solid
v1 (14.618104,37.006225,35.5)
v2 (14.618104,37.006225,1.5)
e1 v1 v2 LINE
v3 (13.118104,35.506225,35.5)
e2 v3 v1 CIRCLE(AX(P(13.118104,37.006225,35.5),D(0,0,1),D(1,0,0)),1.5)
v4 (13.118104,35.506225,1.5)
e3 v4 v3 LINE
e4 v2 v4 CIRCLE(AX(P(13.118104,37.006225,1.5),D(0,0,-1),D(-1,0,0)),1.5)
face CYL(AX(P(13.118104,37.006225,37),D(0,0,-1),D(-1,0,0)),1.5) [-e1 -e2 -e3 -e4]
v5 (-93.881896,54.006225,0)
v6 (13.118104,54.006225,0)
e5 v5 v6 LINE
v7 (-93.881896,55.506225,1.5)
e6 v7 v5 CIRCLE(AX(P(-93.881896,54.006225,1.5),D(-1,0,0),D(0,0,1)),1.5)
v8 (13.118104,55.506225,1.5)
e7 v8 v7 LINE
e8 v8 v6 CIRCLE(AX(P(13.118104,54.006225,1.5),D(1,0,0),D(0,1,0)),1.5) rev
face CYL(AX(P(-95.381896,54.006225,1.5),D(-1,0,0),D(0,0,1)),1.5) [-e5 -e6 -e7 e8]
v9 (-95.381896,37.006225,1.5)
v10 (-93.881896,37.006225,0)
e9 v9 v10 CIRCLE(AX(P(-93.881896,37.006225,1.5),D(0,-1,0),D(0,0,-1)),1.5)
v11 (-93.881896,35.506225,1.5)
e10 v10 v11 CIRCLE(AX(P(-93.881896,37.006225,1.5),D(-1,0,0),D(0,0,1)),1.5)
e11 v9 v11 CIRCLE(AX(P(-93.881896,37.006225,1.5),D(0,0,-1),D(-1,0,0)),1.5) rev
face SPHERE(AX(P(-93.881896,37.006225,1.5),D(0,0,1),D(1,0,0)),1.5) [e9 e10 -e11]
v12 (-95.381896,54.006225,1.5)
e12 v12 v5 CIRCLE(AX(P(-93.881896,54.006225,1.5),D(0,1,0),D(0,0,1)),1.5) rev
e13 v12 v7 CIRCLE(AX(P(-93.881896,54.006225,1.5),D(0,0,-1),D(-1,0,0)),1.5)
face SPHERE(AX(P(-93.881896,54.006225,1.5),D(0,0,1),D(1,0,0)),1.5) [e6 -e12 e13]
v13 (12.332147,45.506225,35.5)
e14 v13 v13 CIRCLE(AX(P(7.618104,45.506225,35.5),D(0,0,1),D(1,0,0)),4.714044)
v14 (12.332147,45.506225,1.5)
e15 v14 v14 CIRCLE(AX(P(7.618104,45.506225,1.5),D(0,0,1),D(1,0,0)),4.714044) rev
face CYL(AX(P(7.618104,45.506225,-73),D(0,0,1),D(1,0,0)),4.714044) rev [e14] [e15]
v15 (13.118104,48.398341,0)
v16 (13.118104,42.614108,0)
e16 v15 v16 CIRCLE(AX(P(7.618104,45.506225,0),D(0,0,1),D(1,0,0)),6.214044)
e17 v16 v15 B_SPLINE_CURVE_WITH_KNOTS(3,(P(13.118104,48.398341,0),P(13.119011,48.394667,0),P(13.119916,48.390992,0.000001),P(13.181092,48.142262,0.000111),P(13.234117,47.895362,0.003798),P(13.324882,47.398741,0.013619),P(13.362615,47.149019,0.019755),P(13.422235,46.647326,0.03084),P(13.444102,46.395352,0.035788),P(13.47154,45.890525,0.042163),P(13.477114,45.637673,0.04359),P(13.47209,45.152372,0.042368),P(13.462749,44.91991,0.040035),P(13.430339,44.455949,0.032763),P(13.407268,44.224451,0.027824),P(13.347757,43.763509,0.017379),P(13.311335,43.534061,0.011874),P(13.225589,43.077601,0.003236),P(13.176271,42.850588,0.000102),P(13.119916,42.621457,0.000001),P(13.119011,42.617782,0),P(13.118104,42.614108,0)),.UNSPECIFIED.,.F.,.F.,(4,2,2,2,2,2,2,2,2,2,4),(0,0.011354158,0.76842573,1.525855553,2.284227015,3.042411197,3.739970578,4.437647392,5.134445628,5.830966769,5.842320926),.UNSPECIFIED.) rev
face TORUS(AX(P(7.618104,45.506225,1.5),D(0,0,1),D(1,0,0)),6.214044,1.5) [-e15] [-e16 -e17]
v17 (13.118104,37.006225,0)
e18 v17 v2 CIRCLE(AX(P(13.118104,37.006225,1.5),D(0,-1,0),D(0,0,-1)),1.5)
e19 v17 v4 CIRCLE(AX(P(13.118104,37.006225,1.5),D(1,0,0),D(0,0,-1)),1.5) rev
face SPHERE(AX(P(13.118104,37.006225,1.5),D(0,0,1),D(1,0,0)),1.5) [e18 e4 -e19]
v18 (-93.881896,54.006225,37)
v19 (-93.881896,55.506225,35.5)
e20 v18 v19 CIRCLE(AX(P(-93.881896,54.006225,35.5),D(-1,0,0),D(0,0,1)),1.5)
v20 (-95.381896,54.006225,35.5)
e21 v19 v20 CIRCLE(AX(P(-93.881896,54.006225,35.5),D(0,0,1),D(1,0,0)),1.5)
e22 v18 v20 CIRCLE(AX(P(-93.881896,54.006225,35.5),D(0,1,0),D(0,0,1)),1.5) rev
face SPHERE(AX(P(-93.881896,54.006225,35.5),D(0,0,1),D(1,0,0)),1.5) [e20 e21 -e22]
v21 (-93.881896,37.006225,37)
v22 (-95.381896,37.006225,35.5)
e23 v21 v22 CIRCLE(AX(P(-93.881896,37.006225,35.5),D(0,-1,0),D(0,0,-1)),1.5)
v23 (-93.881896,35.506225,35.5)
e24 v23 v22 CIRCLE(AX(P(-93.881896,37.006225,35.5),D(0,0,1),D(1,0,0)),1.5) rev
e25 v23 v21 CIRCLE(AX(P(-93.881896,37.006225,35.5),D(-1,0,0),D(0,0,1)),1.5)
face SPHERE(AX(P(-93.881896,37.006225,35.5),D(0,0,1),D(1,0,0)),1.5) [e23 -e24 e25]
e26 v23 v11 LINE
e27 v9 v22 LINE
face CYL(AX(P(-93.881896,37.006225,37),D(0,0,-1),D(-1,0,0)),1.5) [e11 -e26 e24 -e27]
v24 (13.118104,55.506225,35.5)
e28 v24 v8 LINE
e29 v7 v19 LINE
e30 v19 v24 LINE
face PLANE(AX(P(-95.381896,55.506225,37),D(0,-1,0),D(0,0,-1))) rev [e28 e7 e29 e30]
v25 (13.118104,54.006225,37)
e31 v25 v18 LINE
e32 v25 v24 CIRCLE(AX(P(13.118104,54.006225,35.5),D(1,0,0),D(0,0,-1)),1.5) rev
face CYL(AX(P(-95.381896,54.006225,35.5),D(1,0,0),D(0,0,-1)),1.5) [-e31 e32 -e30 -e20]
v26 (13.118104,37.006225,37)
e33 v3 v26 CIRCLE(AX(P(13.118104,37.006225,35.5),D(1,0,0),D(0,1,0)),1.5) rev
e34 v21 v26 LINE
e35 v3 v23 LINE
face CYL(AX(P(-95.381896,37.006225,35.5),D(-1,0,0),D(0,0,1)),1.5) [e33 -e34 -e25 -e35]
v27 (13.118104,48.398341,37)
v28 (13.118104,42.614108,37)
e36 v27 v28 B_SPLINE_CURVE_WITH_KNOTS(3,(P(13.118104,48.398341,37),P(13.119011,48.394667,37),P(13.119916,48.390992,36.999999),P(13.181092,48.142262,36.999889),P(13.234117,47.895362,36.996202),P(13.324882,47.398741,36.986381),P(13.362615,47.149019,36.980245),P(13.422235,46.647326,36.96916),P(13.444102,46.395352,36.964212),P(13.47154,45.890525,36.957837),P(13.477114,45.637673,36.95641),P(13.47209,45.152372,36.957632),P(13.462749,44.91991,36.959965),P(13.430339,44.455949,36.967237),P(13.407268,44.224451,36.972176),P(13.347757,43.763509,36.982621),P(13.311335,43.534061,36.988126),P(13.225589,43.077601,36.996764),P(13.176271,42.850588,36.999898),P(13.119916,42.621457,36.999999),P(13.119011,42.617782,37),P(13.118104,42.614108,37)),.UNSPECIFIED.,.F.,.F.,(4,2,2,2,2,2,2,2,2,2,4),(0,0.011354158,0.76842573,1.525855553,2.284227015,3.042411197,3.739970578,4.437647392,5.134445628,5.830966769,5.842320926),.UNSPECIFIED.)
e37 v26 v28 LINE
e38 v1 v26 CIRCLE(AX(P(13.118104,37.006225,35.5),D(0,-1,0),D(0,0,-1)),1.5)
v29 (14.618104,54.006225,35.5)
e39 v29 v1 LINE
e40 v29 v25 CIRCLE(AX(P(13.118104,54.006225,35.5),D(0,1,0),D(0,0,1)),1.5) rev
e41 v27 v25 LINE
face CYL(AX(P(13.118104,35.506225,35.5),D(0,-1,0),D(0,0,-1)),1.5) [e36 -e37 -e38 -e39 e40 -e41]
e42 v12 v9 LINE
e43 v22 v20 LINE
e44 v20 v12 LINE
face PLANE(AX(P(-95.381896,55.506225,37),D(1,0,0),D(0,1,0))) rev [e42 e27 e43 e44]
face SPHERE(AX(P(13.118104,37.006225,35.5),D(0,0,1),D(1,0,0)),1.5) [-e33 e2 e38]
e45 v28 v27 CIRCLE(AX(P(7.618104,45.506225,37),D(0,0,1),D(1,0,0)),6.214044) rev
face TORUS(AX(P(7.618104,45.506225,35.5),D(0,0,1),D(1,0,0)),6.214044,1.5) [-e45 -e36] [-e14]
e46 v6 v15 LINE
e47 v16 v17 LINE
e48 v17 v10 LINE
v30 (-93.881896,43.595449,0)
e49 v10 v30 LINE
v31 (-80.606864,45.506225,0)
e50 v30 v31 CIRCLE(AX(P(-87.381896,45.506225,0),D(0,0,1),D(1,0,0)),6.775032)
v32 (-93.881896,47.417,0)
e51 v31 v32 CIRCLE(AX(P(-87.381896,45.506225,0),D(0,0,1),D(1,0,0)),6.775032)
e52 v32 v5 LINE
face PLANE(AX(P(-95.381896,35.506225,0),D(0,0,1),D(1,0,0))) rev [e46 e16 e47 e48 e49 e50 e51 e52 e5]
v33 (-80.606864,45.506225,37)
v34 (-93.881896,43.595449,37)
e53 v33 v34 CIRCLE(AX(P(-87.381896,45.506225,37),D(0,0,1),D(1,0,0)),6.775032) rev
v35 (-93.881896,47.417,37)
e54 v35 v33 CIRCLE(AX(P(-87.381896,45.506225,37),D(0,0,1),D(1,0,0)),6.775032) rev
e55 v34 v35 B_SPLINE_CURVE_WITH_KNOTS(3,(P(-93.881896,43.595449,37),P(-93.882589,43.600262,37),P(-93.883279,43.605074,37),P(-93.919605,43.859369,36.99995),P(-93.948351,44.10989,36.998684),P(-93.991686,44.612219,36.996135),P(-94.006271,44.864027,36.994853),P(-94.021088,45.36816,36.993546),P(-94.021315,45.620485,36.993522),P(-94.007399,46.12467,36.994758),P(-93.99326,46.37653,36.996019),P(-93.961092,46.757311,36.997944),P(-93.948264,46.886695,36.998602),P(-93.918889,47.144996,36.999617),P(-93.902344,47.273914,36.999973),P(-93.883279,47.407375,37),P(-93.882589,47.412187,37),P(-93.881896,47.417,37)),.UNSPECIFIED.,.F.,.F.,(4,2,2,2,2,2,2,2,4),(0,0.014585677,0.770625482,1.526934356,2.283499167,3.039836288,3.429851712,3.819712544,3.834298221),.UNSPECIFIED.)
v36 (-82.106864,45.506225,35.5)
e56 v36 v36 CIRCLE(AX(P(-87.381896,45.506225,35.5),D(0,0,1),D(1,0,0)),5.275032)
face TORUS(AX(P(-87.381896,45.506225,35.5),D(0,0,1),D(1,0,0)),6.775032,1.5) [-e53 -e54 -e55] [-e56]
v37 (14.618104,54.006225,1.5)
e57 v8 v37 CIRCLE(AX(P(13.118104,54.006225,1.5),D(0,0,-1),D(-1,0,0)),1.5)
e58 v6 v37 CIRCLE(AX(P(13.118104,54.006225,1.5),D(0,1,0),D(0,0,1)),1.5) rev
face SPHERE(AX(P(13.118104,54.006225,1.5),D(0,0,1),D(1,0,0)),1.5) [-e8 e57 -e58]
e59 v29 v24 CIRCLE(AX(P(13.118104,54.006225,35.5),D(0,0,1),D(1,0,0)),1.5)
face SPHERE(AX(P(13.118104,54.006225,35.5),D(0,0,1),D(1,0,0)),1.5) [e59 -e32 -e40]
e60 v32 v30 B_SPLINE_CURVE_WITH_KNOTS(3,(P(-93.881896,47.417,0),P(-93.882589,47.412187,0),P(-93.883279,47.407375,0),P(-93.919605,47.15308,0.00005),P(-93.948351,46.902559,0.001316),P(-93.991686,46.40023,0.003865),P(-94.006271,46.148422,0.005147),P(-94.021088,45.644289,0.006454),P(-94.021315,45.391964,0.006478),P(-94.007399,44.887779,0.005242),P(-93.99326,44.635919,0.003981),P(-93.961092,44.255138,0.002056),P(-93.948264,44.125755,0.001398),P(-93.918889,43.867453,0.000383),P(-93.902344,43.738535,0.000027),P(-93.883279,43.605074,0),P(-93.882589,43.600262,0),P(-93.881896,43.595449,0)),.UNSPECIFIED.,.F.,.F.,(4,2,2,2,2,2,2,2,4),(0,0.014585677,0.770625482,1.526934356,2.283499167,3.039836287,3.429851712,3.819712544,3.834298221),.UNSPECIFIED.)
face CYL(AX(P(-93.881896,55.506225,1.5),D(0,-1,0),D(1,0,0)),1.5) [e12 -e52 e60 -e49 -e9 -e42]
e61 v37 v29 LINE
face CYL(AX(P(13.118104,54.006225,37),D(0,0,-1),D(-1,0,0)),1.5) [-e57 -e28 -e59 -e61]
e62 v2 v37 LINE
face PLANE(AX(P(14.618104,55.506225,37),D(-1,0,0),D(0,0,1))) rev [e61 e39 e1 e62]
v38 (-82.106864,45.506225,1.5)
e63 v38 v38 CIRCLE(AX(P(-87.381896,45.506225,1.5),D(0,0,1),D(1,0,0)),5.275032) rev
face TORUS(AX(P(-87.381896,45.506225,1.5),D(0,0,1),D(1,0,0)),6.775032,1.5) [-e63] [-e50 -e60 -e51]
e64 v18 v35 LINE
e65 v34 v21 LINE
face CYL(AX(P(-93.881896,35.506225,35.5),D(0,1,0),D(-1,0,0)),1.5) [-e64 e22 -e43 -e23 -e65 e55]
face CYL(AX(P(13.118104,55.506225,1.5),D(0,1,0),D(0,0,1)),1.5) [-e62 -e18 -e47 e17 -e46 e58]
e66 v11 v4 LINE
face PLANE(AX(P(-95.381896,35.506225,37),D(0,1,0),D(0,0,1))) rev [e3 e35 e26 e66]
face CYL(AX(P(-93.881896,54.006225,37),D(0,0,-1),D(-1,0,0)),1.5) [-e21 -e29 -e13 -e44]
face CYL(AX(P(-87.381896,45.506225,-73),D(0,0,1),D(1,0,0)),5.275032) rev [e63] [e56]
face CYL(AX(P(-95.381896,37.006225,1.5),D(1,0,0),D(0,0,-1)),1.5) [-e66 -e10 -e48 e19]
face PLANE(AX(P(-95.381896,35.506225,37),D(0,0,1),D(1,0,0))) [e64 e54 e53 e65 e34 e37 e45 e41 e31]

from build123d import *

# Parameters (mm, degrees)
SKETCH1_W      = 110
SKETCH1_H      = 20
EXTRUDE1_DEPTH = 37
SKETCH2_R      = 5.275032214
SKETCH2_R_2    = 4.714043742
EXTRUDE2_DEPTH = 110
FILLET1_R      = 1.5


with BuildPart() as part:
    # Sketch1 → Extrude1 (new body)
    with BuildSketch(Plane.XY):
        with Locations((-40.381896345, 45.506224595)):
            Rectangle(SKETCH1_W, SKETCH1_H)
    extrude(amount=EXTRUDE1_DEPTH)

    # Sketch2 → Extrude2 (cut)
    with BuildSketch(Plane.XY.offset(37)):
        with Locations((-87.381896345, 45.506224595)):
            Circle(SKETCH2_R)
        with Locations((7.618103655, 45.506224595)):
            Circle(SKETCH2_R_2)
    extrude(amount=-EXTRUDE2_DEPTH, mode=Mode.SUBTRACT)

    # Fillet1
    # the kernel refuses this fillet: 1.5 mm, written as the material it takes off along each edge
    with BuildSketch(Plane(origin=(13.118103655, 54.006224595, 35.5), x_dir=(1, 0, 0), z_dir=(0, 1, 0))) as fillet1_piece_1_section:
        Polygon((0, 0), (FILLET1_R, 0), (FILLET1_R, -FILLET1_R), (0, -FILLET1_R), align=None)
    fillet1_piece_1 = extrude(amount=FILLET1_R, mode=Mode.PRIVATE)
    fillet1_piece_1 = fillet1_piece_1 - Plane(origin=(13.118103655, 54.006224595, 35.5), x_dir=(-0.7071067811865475, 0, -0.7071067811865475), z_dir=(0, 1, 0)) * Sphere(FILLET1_R, mode=Mode.PRIVATE)
    add(fillet1_piece_1, mode=Mode.SUBTRACT)
    with BuildSketch(Plane(origin=(13.118103655, 37.006224595, 35.5), x_dir=(0, 0, 1), z_dir=(1, 0, 0))) as fillet1_piece_2_section:
        Polygon((0, 0), (FILLET1_R, 0), (FILLET1_R, FILLET1_R), (0, FILLET1_R), align=None)
    fillet1_piece_2 = extrude(amount=FILLET1_R, mode=Mode.PRIVATE)
    fillet1_piece_2 = fillet1_piece_2 - Plane(origin=(13.118103655, 37.006224595, 35.5), x_dir=(0, 0.7071067811865475, -0.7071067811865475), z_dir=(1, 0, 0)) * Sphere(FILLET1_R, mode=Mode.PRIVATE)
    add(fillet1_piece_2, mode=Mode.SUBTRACT)
    with BuildSketch(Plane(origin=(-93.881896345, 54.006224595, 35.5), x_dir=(-1, 0, 0), z_dir=(0, 1, 0))) as fillet1_piece_3_section:
        Polygon((0, 0), (FILLET1_R, 0), (FILLET1_R, FILLET1_R), (0, FILLET1_R), align=None)
    fillet1_piece_3 = extrude(amount=FILLET1_R, mode=Mode.PRIVATE)
    fillet1_piece_3 = fillet1_piece_3 - Plane(origin=(-93.881896345, 54.006224595, 35.5), x_dir=(0.7071067811865475, 0, -0.7071067811865475), z_dir=(0, 1, 0)) * Sphere(FILLET1_R, mode=Mode.PRIVATE)
    add(fillet1_piece_3, mode=Mode.SUBTRACT)
    with BuildSketch(Plane(origin=(-93.881896345, 37.006224595, 35.5), x_dir=(0, 0, 1), z_dir=(-1, 0, 0))) as fillet1_piece_4_section:
        Polygon((0, 0), (FILLET1_R, 0), (FILLET1_R, -FILLET1_R), (0, -FILLET1_R), align=None)
    fillet1_piece_4 = extrude(amount=FILLET1_R, mode=Mode.PRIVATE)
    fillet1_piece_4 = fillet1_piece_4 - Plane(origin=(-93.881896345, 37.006224595, 35.5), x_dir=(0, 0.7071067811865475, -0.7071067811865475), z_dir=(-1, 0, 0)) * Sphere(FILLET1_R, mode=Mode.PRIVATE)
    add(fillet1_piece_4, mode=Mode.SUBTRACT)
    with BuildSketch(Plane(origin=(-93.881896345, 54.006224595, 1.5), x_dir=(-1, 0, 0), z_dir=(0, 1, 0))) as fillet1_piece_5_section:
        Polygon((0, 0), (FILLET1_R, 0), (FILLET1_R, -FILLET1_R), (0, -FILLET1_R), align=None)
    fillet1_piece_5 = extrude(amount=FILLET1_R, mode=Mode.PRIVATE)
    fillet1_piece_5 = fillet1_piece_5 - Plane(origin=(-93.881896345, 54.006224595, 1.5), x_dir=(0.7071067811865475, 0, 0.7071067811865475), z_dir=(0, 1, 0)) * Sphere(FILLET1_R, mode=Mode.PRIVATE)
    add(fillet1_piece_5, mode=Mode.SUBTRACT)
    with BuildSketch(Plane(origin=(13.118103655, 54.006224595, 1.5), x_dir=(1, 0, 0), z_dir=(0, 1, 0))) as fillet1_piece_6_section:
        Polygon((0, 0), (FILLET1_R, 0), (FILLET1_R, FILLET1_R), (0, FILLET1_R), align=None)
    fillet1_piece_6 = extrude(amount=FILLET1_R, mode=Mode.PRIVATE)
    fillet1_piece_6 = fillet1_piece_6 - Plane(origin=(13.118103655, 54.006224595, 1.5), x_dir=(-0.7071067811865475, 0, 0.7071067811865475), z_dir=(0, 1, 0)) * Sphere(FILLET1_R, mode=Mode.PRIVATE)
    add(fillet1_piece_6, mode=Mode.SUBTRACT)
    with BuildSketch(Plane(origin=(13.118103655, 37.006224595, 1.5), x_dir=(0, 0, -1), z_dir=(1, 0, 0))) as fillet1_piece_7_section:
        Polygon((0, 0), (FILLET1_R, 0), (FILLET1_R, -FILLET1_R), (0, -FILLET1_R), align=None)
    fillet1_piece_7 = extrude(amount=FILLET1_R, mode=Mode.PRIVATE)
    fillet1_piece_7 = fillet1_piece_7 - Plane(origin=(13.118103655, 37.006224595, 1.5), x_dir=(0, 0.7071067811865475, 0.7071067811865475), z_dir=(1, 0, 0)) * Sphere(FILLET1_R, mode=Mode.PRIVATE)
    add(fillet1_piece_7, mode=Mode.SUBTRACT)
    with BuildSketch(Plane(origin=(-93.881896345, 37.006224595, 1.5), x_dir=(0, 0, -1), z_dir=(-1, 0, 0))) as fillet1_piece_8_section:
        Polygon((0, 0), (FILLET1_R, 0), (FILLET1_R, FILLET1_R), (0, FILLET1_R), align=None)
    fillet1_piece_8 = extrude(amount=FILLET1_R, mode=Mode.PRIVATE)
    fillet1_piece_8 = fillet1_piece_8 - Plane(origin=(-93.881896345, 37.006224595, 1.5), x_dir=(0, 0.7071067811865475, 0.7071067811865475), z_dir=(-1, 0, 0)) * Sphere(FILLET1_R, mode=Mode.PRIVATE)
    add(fillet1_piece_8, mode=Mode.SUBTRACT)
    with BuildSketch(Plane(origin=(14.618103655, 54.006224595, 37), x_dir=(0, 0, -1), z_dir=(0, -1, 0)), Plane(origin=(-95.381896345, 37.006224595, 37), x_dir=(0, 0, -1), z_dir=(0, 1, 0))) as fillet1_piece_9:
        with BuildLine():
            CenterArc((FILLET1_R, -FILLET1_R), FILLET1_R, 90, 90)
            Line((0, -FILLET1_R), (0, 0))
            Line((0, 0), (FILLET1_R, 0))
        make_face()
    extrude(amount=17, mode=Mode.SUBTRACT)
    with BuildSketch(Plane(origin=(-93.881896345, 55.506224595, 37), x_dir=(0, 0, -1), z_dir=(1, 0, 0)), Plane(origin=(13.118103655, 35.506224595, 0), x_dir=(0, 1, 0), z_dir=(-1, 0, 0))) as fillet1_piece_10:
        with BuildLine():
            CenterArc((FILLET1_R, -FILLET1_R), FILLET1_R, 90, 90)
            Line((0, -FILLET1_R), (0, 0))
            Line((0, 0), (FILLET1_R, 0))
        make_face()
    extrude(amount=107, mode=Mode.SUBTRACT)
    with BuildSketch(Plane(origin=(-87.381896345, 45.506224595, 0), x_dir=(1, 0, 0), z_dir=(0, -1, 0))) as fillet1_piece_11:
        with BuildLine():
            CenterArc((5.275032214 + FILLET1_R, FILLET1_R), FILLET1_R, 180, 90)
            Line((5.275032214, FILLET1_R), (5.275032214, 0))
            Line((5.275032214, 0), (5.275032214 + FILLET1_R, 0))
        make_face()
    revolve(axis=Axis((-87.381896345, 45.506224595, 0), (0, 0, 1)), mode=Mode.SUBTRACT)
    with BuildSketch(Plane(origin=(-87.381896345, 45.506224595, 37), x_dir=(1, 0, 0), z_dir=(0, -1, 0))) as fillet1_piece_12:
        with BuildLine():
            CenterArc((5.275032214 + FILLET1_R, -FILLET1_R), FILLET1_R, 90, 90)
            Line((5.275032214, -FILLET1_R), (5.275032214, 0))
            Line((5.275032214, 0), (5.275032214 + FILLET1_R, 0))
        make_face()
    revolve(axis=Axis((-87.381896345, 45.506224595, 37), (0, 0, 1)), mode=Mode.SUBTRACT)
    with BuildSketch(Plane(origin=(7.618103655, 45.506224595, 0), x_dir=(1, 0, 0), z_dir=(0, -1, 0))) as fillet1_piece_13:
        with BuildLine():
            CenterArc((4.714043742 + FILLET1_R, FILLET1_R), FILLET1_R, 180, 90)
            Line((4.714043742, FILLET1_R), (4.714043742, 0))
            Line((4.714043742, 0), (4.714043742 + FILLET1_R, 0))
        make_face()
    revolve(axis=Axis((7.618103655, 45.506224595, 0), (0, 0, 1)), mode=Mode.SUBTRACT)
    with BuildSketch(Plane(origin=(7.618103655, 45.506224595, 37), x_dir=(1, 0, 0), z_dir=(0, -1, 0))) as fillet1_piece_14:
        with BuildLine():
            CenterArc((4.714043742 + FILLET1_R, -FILLET1_R), FILLET1_R, 90, 90)
            Line((4.714043742, -FILLET1_R), (4.714043742, 0))
            Line((4.714043742, 0), (4.714043742 + FILLET1_R, 0))
        make_face()
    revolve(axis=Axis((7.618103655, 45.506224595, 37), (0, 0, 1)), mode=Mode.SUBTRACT)
    with BuildSketch(Plane(origin=(-93.881896345, 55.506224595, 0), x_dir=(0, 0, 1), z_dir=(1, 0, 0)), Plane(origin=(13.118103655, 35.506224595, 37), x_dir=(0, 1, 0), z_dir=(-1, 0, 0))) as fillet1_piece_15:
        with BuildLine():
            CenterArc((FILLET1_R, FILLET1_R), FILLET1_R, 180, 90)
            Line((0, FILLET1_R), (0, 0))
            Line((0, 0), (FILLET1_R, 0))
        make_face()
    extrude(amount=107, mode=Mode.SUBTRACT)
    with BuildSketch(Plane(origin=(14.618103655, 54.006224595, 0), x_dir=(0, 0, 1), z_dir=(0, -1, 0)), Plane(origin=(-95.381896345, 37.006224595, 0), x_dir=(0, 0, 1), z_dir=(0, 1, 0))) as fillet1_piece_16:
        with BuildLine():
            CenterArc((FILLET1_R, FILLET1_R), FILLET1_R, 180, 90)
            Line((0, FILLET1_R), (0, 0))
            Line((0, 0), (FILLET1_R, 0))
        make_face()
    extrude(amount=17, mode=Mode.SUBTRACT)
    with BuildSketch(Plane(origin=(-95.381896345, 55.506224595, 1.5), x_dir=(1, 0, 0), z_dir=(0, 0, 1)), Plane(origin=(-95.381896345, 35.506224595, 1.5), x_dir=(0, 1, 0), z_dir=(0, 0, 1))) as fillet1_piece_17:
        with BuildLine():
            CenterArc((FILLET1_R, -FILLET1_R), FILLET1_R, 90, 90)
            Line((0, -FILLET1_R), (0, 0))
            Line((0, 0), (FILLET1_R, 0))
        make_face()
    extrude(amount=34, mode=Mode.SUBTRACT)
    with BuildSketch(Plane(origin=(14.618103655, 55.506224595, 1.5), x_dir=(-1, 0, 0), z_dir=(0, 0, 1)), Plane(origin=(14.618103655, 35.506224595, 1.5), x_dir=(0, 1, 0), z_dir=(0, 0, 1))) as fillet1_piece_18:
        with BuildLine():
            CenterArc((FILLET1_R, FILLET1_R), FILLET1_R, 180, 90)
            Line((0, FILLET1_R), (0, 0))
            Line((0, 0), (FILLET1_R, 0))
        make_face()
    extrude(amount=34, mode=Mode.SUBTRACT)


solid = part.part
